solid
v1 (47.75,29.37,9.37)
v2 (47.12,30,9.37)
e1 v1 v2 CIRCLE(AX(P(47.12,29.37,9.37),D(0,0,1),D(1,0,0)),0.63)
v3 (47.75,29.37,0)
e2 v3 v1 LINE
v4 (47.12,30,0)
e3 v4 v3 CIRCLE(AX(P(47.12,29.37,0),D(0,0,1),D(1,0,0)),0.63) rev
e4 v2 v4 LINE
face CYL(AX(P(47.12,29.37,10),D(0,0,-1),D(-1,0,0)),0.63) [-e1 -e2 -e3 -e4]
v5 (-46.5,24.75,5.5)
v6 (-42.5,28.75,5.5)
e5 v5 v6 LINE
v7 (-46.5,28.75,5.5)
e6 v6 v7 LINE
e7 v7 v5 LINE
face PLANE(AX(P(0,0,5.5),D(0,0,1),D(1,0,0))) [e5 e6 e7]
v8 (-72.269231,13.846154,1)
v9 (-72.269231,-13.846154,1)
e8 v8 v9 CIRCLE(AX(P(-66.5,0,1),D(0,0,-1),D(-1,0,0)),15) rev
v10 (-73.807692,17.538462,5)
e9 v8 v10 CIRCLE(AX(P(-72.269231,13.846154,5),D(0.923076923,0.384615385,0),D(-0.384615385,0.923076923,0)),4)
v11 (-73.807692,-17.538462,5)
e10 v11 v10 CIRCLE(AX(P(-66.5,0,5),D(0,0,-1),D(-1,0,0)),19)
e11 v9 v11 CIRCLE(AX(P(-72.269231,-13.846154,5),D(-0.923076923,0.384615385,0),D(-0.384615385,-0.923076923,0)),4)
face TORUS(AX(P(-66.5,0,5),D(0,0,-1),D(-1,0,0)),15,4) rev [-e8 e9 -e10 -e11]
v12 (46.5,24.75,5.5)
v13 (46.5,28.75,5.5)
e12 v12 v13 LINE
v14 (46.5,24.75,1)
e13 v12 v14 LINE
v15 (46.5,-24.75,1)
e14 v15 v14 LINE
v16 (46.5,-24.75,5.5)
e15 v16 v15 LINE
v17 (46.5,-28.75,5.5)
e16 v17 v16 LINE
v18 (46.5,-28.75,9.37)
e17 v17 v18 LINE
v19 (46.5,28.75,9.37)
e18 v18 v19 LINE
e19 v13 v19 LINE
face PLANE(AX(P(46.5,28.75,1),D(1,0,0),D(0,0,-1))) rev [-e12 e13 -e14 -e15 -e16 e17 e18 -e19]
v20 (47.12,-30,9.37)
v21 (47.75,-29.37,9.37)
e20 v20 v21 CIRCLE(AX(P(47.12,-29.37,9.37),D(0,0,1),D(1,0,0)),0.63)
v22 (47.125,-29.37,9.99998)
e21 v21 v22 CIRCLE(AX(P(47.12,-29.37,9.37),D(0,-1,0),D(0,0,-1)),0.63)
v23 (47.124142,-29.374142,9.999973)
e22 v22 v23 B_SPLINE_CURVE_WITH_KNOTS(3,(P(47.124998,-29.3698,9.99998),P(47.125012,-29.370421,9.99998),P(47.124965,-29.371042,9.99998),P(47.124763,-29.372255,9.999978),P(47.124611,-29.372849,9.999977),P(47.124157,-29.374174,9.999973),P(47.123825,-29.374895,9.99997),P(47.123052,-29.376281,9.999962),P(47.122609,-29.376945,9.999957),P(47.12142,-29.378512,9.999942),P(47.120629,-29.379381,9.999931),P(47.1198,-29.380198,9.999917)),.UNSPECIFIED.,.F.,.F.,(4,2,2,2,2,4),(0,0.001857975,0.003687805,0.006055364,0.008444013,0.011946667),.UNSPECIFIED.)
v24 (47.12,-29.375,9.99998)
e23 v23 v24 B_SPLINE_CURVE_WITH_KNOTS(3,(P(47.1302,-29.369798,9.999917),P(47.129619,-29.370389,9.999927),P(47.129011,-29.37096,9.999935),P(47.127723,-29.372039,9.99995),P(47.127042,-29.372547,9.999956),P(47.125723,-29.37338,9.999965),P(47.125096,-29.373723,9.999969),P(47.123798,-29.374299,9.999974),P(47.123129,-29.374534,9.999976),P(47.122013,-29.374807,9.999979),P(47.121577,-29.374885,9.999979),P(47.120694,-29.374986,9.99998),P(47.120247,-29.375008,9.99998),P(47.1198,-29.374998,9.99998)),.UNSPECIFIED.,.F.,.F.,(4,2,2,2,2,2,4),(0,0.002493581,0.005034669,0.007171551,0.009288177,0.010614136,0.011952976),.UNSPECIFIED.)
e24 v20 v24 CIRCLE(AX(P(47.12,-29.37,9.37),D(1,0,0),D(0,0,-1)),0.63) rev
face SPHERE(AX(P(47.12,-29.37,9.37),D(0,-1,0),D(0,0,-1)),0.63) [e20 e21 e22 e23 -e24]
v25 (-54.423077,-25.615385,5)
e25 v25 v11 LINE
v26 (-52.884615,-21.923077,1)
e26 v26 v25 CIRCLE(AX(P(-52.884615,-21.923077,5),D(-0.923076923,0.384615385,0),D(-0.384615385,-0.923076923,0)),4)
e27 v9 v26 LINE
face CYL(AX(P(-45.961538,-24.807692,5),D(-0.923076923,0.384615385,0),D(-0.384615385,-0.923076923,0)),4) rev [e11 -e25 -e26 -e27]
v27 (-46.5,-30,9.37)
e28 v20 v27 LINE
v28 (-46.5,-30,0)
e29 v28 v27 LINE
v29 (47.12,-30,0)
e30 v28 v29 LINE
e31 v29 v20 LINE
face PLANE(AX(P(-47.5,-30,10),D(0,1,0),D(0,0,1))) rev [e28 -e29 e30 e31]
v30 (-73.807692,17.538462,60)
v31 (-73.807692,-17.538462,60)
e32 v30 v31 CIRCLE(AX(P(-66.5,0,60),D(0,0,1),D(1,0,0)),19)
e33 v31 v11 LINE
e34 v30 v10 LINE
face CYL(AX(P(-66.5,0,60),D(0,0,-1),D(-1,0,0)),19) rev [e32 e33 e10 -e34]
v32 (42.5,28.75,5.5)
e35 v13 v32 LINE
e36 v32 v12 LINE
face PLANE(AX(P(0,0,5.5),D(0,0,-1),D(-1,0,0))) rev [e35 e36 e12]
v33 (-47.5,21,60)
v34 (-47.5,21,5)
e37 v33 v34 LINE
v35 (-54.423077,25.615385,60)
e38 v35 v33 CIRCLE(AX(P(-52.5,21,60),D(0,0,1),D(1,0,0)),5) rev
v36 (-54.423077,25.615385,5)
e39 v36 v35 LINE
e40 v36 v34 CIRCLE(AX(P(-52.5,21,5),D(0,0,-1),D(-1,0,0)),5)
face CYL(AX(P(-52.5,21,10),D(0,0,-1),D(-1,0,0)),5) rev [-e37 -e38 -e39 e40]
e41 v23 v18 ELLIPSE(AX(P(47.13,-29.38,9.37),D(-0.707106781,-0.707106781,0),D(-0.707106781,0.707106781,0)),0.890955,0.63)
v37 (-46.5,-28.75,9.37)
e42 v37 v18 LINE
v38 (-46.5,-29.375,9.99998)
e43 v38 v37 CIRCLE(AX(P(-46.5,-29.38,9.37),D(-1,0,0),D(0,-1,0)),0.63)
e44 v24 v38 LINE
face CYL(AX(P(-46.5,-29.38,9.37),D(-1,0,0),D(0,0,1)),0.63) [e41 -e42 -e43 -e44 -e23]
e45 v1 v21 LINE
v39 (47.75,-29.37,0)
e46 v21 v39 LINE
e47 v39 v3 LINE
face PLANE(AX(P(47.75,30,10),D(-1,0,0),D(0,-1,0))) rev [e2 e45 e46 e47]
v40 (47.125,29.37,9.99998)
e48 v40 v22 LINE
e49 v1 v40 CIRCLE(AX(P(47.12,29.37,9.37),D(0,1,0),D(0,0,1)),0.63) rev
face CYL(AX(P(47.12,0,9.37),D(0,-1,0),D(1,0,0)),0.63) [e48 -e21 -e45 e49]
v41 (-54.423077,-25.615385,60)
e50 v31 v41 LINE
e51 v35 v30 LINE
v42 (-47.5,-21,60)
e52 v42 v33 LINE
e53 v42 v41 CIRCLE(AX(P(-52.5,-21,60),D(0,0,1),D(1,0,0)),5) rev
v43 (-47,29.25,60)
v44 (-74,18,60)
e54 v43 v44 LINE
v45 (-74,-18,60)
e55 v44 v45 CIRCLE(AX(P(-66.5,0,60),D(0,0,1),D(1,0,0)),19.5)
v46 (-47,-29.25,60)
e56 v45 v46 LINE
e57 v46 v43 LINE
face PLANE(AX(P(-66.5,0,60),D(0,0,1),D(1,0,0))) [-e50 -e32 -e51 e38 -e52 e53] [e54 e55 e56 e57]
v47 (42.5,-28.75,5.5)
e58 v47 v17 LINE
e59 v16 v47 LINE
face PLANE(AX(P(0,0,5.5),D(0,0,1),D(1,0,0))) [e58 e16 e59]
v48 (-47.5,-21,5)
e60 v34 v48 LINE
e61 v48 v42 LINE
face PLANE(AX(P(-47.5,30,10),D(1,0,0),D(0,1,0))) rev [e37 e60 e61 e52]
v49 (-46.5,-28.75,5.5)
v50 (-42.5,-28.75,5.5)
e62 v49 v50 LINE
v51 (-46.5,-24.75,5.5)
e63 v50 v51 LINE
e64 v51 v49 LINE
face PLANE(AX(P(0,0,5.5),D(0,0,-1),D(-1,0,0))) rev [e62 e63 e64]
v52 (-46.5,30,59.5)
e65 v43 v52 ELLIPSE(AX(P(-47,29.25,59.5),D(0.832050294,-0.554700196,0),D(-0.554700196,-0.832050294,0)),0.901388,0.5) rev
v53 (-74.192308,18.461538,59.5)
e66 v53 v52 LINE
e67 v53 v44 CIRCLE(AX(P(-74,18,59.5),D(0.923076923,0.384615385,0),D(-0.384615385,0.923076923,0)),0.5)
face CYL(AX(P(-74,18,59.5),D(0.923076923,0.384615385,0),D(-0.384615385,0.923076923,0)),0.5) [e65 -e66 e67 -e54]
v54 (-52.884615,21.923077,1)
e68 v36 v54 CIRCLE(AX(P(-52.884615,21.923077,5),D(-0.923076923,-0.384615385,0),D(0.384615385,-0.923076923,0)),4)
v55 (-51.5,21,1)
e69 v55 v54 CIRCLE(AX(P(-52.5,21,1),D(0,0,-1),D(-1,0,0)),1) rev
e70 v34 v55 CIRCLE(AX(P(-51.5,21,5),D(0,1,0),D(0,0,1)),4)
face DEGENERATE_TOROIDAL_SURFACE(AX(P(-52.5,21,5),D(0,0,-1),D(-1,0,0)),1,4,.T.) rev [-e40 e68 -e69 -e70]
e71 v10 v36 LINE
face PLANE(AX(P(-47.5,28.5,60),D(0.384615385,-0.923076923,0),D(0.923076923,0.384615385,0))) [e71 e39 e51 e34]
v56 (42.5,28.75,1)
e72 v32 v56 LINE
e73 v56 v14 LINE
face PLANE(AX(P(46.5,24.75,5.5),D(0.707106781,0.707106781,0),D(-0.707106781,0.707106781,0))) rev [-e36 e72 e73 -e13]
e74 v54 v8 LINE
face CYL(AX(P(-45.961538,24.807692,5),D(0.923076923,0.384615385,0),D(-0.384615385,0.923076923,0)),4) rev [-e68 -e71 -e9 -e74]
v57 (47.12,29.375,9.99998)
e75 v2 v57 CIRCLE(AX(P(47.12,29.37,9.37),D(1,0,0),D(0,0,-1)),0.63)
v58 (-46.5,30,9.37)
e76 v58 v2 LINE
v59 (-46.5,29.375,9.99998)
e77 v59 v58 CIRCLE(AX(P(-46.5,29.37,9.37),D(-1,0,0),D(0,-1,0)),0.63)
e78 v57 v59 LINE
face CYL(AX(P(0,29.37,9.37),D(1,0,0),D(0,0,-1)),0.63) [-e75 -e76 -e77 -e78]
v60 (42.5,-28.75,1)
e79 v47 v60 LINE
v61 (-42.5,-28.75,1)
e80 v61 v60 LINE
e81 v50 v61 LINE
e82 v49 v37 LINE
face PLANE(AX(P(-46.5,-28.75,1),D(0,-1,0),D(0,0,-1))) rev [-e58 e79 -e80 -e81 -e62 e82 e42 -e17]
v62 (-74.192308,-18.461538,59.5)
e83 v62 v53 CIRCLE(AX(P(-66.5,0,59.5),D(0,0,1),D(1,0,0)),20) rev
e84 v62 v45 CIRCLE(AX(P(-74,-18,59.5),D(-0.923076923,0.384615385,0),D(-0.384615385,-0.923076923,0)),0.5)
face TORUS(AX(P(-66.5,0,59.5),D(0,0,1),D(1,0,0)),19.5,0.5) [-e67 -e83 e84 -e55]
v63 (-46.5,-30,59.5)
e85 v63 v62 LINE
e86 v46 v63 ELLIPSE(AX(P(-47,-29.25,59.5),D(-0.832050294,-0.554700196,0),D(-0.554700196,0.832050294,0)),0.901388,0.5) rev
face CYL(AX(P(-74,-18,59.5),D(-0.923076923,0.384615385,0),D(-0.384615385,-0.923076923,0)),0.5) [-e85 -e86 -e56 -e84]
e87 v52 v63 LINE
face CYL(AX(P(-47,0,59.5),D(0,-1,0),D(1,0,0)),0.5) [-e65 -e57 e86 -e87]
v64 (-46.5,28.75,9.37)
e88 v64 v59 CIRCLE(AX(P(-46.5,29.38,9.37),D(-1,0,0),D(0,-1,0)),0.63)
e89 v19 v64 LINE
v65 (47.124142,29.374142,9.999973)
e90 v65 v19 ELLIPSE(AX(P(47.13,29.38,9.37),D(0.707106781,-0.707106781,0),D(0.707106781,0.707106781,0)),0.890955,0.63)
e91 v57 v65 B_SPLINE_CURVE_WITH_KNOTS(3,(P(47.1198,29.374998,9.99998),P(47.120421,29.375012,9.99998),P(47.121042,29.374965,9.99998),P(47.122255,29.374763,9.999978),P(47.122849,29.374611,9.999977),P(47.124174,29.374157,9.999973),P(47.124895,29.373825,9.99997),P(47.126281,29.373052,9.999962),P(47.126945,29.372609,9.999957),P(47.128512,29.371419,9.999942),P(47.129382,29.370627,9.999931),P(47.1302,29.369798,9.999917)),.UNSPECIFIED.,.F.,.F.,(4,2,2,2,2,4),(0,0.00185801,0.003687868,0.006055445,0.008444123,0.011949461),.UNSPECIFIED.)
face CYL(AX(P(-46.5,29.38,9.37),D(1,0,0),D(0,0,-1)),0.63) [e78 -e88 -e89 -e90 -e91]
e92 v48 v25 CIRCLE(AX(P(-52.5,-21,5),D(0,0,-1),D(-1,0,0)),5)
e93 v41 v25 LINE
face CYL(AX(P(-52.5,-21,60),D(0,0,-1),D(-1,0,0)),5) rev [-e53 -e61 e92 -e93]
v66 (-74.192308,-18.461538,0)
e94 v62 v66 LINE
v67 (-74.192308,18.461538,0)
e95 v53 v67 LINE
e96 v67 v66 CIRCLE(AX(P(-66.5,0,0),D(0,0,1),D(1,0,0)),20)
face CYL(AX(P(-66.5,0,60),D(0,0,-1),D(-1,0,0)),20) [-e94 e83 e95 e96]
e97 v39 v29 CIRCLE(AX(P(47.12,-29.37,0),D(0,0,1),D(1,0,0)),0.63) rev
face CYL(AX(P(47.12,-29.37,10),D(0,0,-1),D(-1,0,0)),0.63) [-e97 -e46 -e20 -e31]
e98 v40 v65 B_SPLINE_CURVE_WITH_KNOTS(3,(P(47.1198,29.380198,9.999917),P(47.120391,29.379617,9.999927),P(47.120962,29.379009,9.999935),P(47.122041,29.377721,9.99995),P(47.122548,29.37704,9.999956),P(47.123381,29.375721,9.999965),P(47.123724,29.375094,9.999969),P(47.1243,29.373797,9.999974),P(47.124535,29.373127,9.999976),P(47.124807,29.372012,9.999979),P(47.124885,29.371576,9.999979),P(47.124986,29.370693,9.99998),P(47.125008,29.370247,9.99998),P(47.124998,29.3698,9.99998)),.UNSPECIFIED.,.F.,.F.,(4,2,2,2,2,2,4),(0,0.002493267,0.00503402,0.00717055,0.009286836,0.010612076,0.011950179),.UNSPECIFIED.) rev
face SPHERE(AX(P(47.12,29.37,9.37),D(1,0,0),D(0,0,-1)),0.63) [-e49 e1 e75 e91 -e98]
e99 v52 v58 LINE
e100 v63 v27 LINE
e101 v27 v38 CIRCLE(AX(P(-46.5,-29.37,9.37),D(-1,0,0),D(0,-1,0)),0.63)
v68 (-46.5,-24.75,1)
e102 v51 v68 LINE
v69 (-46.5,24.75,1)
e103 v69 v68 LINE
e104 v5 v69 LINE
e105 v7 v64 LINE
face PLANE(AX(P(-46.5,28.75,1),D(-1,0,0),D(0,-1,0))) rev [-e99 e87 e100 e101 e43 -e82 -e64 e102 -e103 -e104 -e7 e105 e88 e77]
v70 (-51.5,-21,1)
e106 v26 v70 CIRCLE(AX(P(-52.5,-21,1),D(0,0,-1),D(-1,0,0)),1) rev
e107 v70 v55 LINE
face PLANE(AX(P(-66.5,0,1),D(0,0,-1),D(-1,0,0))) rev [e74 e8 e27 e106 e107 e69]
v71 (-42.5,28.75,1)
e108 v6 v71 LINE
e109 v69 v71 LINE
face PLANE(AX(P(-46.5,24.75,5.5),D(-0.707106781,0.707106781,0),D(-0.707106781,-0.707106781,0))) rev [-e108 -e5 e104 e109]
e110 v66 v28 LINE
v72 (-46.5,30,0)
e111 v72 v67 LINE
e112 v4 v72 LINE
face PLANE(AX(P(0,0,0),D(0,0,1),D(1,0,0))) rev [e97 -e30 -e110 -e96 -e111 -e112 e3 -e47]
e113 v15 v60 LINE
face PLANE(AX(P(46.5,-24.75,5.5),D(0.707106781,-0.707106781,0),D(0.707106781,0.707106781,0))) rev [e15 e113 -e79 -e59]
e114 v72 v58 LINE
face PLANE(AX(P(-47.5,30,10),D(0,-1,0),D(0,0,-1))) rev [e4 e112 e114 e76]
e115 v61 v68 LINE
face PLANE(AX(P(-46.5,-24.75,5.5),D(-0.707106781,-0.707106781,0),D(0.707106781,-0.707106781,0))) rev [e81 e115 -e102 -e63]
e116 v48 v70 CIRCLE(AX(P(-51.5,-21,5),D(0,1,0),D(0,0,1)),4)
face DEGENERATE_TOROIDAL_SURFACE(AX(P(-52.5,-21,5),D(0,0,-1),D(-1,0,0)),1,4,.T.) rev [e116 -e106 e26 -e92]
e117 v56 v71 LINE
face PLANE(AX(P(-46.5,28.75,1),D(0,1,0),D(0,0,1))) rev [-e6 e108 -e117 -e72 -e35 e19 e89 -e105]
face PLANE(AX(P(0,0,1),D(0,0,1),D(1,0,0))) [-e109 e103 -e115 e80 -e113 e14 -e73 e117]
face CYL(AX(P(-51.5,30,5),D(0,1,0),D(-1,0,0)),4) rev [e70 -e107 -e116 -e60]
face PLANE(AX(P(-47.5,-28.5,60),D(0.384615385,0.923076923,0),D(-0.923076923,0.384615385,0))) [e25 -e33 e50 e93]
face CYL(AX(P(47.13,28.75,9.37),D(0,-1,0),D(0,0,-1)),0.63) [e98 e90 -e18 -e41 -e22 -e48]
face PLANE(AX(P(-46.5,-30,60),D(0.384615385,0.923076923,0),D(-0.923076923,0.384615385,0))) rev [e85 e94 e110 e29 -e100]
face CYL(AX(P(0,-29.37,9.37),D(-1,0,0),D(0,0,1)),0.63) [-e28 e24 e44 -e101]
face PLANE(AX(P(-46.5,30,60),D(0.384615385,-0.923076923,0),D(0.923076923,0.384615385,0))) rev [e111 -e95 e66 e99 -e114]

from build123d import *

# Parameters (mm, degrees)
SZKIC1_W                    = 95.25
SZKIC1_H                    = 60
DODANIE_WYCI_GNI_CIE1_DEPTH = 10
SZKIC2_W                    = 93
SZKIC2_H                    = 57.5
WYTNIJ_WYCI_GNI_CIE1_DEPTH  = 9
DODANIE_WYCI_GNI_CIE3_DEPTH = 60
WYTNIJ_WYCI_GNI_CIE2_REACH  = 106.318
DODANIE_WYCI_GNI_CIE4_DEPTH = 1
ZAOKR_GLENIE1_R             = 0.63
ZAOKR_GLENIE2_R             = 5
ZAOKR_GLENIE3_R             = 0.5
DODANIE_WYCI_GNI_CIE2_DEPTH = 4.5
ZAOKR_GLENIE4_R             = 4


with BuildPart() as part:
    # Szkic1 → Dodanie-wyciągnięcie1 (new body)
    with BuildSketch(Plane.XY):
        with Locations((0.125, 0)):
            Rectangle(SZKIC1_W, SZKIC1_H)
    extrude(amount=DODANIE_WYCI_GNI_CIE1_DEPTH)

    # Szkic2 → Wytnij-wyciągnięcie1 (cut)
    with BuildSketch(Plane.XY.offset(10)):
        Rectangle(SZKIC2_W, SZKIC2_H)
    extrude(amount=-WYTNIJ_WYCI_GNI_CIE1_DEPTH, mode=Mode.SUBTRACT)

    # Szkic4 → Dodanie-wyciągnięcie3 (add)
    with BuildSketch(Plane.XY):
        with BuildLine():
            Line((-46.5, -30), (-74.192307692, -18.461538462))
            ThreePointArc((-74.192307692, -18.461538462), (-86.5, 0), (-74.192307692, 18.461538462))
            Line((-74.192307692, 18.461538462), (-46.5, 30))
            Line((-46.5, 30), (-46.5, -30))
        make_face()
        with BuildLine():
            Line((-47.5, -28.5), (-73.807692308, -17.538461538))
            ThreePointArc((-73.807692308, -17.538461538), (-85.5, 0), (-73.807692308, 17.538461538))
            Line((-73.807692308, 17.538461538), (-47.5, 28.5))
            Line((-47.5, 28.5), (-47.5, -28.5))
        make_face(mode=Mode.SUBTRACT)
    extrude(amount=DODANIE_WYCI_GNI_CIE3_DEPTH)

    # Szkic6 → Wytnij-wyciągnięcie2 (cut, up to next)
    with BuildSketch(Plane.XY.offset(10), mode=Mode.PRIVATE) as wytnij_wyci_gni_cie2_sk1:
        Polygon((-46.5, -30), (-47.5, -29.583333333), (-47.5, -30), align=None)
    wytnij_wyci_gni_cie2_tool1 = extrude(wytnij_wyci_gni_cie2_sk1.sketch, amount=-WYTNIJ_WYCI_GNI_CIE2_REACH, mode=Mode.PRIVATE) & part.part
    # Szkic6 → Wytnij-wyciągnięcie2 (cut, up to next)
    with BuildSketch(Plane.XY.offset(10), mode=Mode.PRIVATE) as wytnij_wyci_gni_cie2_sk2:
        Polygon((-46.5, 30), (-47.5, 29.583333333), (-47.5, 30), align=None)
    wytnij_wyci_gni_cie2_tool2 = extrude(wytnij_wyci_gni_cie2_sk2.sketch, amount=-WYTNIJ_WYCI_GNI_CIE2_REACH, mode=Mode.PRIVATE) & part.part
    add(wytnij_wyci_gni_cie2_tool1.solids().sort_by_distance((-47.166667, -29.861111, 10))[0], mode=Mode.SUBTRACT)
    add(wytnij_wyci_gni_cie2_tool2.solids().sort_by_distance((-47.166667, 29.861111, 10))[0], mode=Mode.SUBTRACT)

    # Szkic5 → Dodanie-wyciągnięcie4 (add)
    with BuildSketch(Plane(origin=(0, 0, 0), x_dir=(-1, 0, 0), z_dir=(0, 0, -1))):
        with BuildLine():
            Line((73.807692308, -17.538461538), (47.5, -28.5))
            Line((47.5, -28.5), (47.5, 28.5))
            Line((47.5, 28.5), (73.807692308, 17.538461538))
            ThreePointArc((73.807692308, 17.538461538), (85.5, 0), (73.807692308, -17.538461538))
        make_face()
    extrude(amount=-DODANIE_WYCI_GNI_CIE4_DEPTH)

    # Zaokrąglenie1
    # the kernel refuses this fillet: 0.63 mm, written as the material it takes off along each edge
    with BuildSketch(Plane(origin=(47.12, 29.37, 9.37), x_dir=(1, 0, 0), z_dir=(0, 1, 0))) as zaokr_glenie1_piece_1_section:
        Polygon((0, 0), (ZAOKR_GLENIE1_R * 1.02, 0), (ZAOKR_GLENIE1_R * 1.02, -ZAOKR_GLENIE1_R * 1.02), (0, -ZAOKR_GLENIE1_R * 1.02), align=None)
    zaokr_glenie1_piece_1 = extrude(amount=ZAOKR_GLENIE1_R * 1.02, mode=Mode.PRIVATE)
    zaokr_glenie1_piece_1 = zaokr_glenie1_piece_1 - Plane(origin=(47.12, 29.37, 9.37), x_dir=(-0.7071067811865475, 0, -0.7071067811865475), z_dir=(0, 1, 0)) * Sphere(ZAOKR_GLENIE1_R, mode=Mode.PRIVATE)
    add(zaokr_glenie1_piece_1, mode=Mode.SUBTRACT)
    with BuildSketch(Plane(origin=(47.12, -29.37, 9.37), x_dir=(0, 0, 1), z_dir=(1, 0, 0))) as zaokr_glenie1_piece_2_section:
        Polygon((0, 0), (ZAOKR_GLENIE1_R * 1.02, 0), (ZAOKR_GLENIE1_R * 1.02, ZAOKR_GLENIE1_R * 1.02), (0, ZAOKR_GLENIE1_R * 1.02), align=None)
    zaokr_glenie1_piece_2 = extrude(amount=ZAOKR_GLENIE1_R * 1.02, mode=Mode.PRIVATE)
    zaokr_glenie1_piece_2 = zaokr_glenie1_piece_2 - Plane(origin=(47.12, -29.37, 9.37), x_dir=(0, 0.7071067811865475, -0.7071067811865475), z_dir=(1, 0, 0)) * Sphere(ZAOKR_GLENIE1_R, mode=Mode.PRIVATE)
    add(zaokr_glenie1_piece_2, mode=Mode.SUBTRACT)
    with BuildSketch(Plane(origin=(47.75, 30, -1.575), x_dir=(-1, 0, 0), z_dir=(0, 0, 1)), Plane(origin=(47.75, -30, -1.575), x_dir=(0, 1, 0), z_dir=(0, 0, 1))) as zaokr_glenie1_piece_3:
        with BuildLine():
            CenterArc((ZAOKR_GLENIE1_R, ZAOKR_GLENIE1_R), ZAOKR_GLENIE1_R, 180, 90)
            Line((0, ZAOKR_GLENIE1_R), (0, 0))
            Line((0, 0), (ZAOKR_GLENIE1_R, 0))
        make_face()
    extrude(amount=10.945, mode=Mode.SUBTRACT)
    with BuildSketch(Plane(origin=(-46.5, 30, 10), x_dir=(0, 0, -1), z_dir=(1, 0, 0))) as zaokr_glenie1_piece_4:
        with BuildLine():
            CenterArc((ZAOKR_GLENIE1_R, -ZAOKR_GLENIE1_R), ZAOKR_GLENIE1_R, 90, 90)
            Line((0, -ZAOKR_GLENIE1_R), (0, 0))
            Line((0, 0), (ZAOKR_GLENIE1_R, 0))
        make_face()
    extrude(amount=93.62, mode=Mode.SUBTRACT)
    with BuildSketch(Plane(origin=(47.75, 29.37, 10), x_dir=(0, 0, -1), z_dir=(0, -1, 0))) as zaokr_glenie1_piece_5:
        with BuildLine():
            CenterArc((ZAOKR_GLENIE1_R, -ZAOKR_GLENIE1_R), ZAOKR_GLENIE1_R, 90, 90)
            Line((0, -ZAOKR_GLENIE1_R), (0, 0))
            Line((0, 0), (ZAOKR_GLENIE1_R, 0))
        make_face()
    extrude(amount=58.74, mode=Mode.SUBTRACT)
    with BuildSketch(Plane(origin=(47.12, -30, 10), x_dir=(0, 1, 0), z_dir=(-1, 0, 0))) as zaokr_glenie1_piece_6:
        with BuildLine():
            CenterArc((ZAOKR_GLENIE1_R, ZAOKR_GLENIE1_R), ZAOKR_GLENIE1_R, 180, 90)
            Line((0, ZAOKR_GLENIE1_R), (0, 0))
            Line((0, 0), (ZAOKR_GLENIE1_R, 0))
        make_face()
    extrude(amount=93.62, mode=Mode.SUBTRACT)
    with BuildSketch(Plane(origin=(46.5, 28.75, 10), x_dir=(1, 0, 0), z_dir=(0, -1, 0))) as zaokr_glenie1_piece_7:
        with BuildLine():
            CenterArc((ZAOKR_GLENIE1_R, -ZAOKR_GLENIE1_R), ZAOKR_GLENIE1_R, 90, 90)
            Line((0, -ZAOKR_GLENIE1_R), (0, 0))
            Line((0, 0), (ZAOKR_GLENIE1_R, 0))
        make_face()
    extrude(amount=57.5, mode=Mode.SUBTRACT)
    with BuildSketch(Plane(origin=(-46.5, 28.75, 10), x_dir=(0, 1, 0), z_dir=(1, 0, 0)), Plane(origin=(46.5, -28.75, 10), x_dir=(0, -1, 0), z_dir=(-1, 0, 0))) as zaokr_glenie1_piece_8:
        with BuildLine():
            CenterArc((ZAOKR_GLENIE1_R, -ZAOKR_GLENIE1_R), ZAOKR_GLENIE1_R, 90, 90)
            Line((0, -ZAOKR_GLENIE1_R), (0, 0))
            Line((0, 0), (ZAOKR_GLENIE1_R, 0))
        make_face()
    extrude(amount=93, mode=Mode.SUBTRACT)
    with BuildSketch(Plane(origin=(-46.5, 28.75, 10), x_dir=(0, 1, 0), z_dir=(1, 0, 0))) as zaokr_glenie1_piece_9a_section:
        with BuildLine():
            CenterArc((ZAOKR_GLENIE1_R, -ZAOKR_GLENIE1_R), ZAOKR_GLENIE1_R, 90, 90)
            Line((0, -ZAOKR_GLENIE1_R), (0, 0))
            Line((0, 0), (ZAOKR_GLENIE1_R, 0))
        make_face()
    zaokr_glenie1_piece_9a = extrude(amount=94.575, mode=Mode.PRIVATE)
    zaokr_glenie1_piece_9a = split(zaokr_glenie1_piece_9a, bisect_by=Plane(origin=(47.75, 28.75, 10), z_dir=(-1, 0, 0)), keep=Keep.TOP, mode=Mode.PRIVATE)
    zaokr_glenie1_piece_9a = split(zaokr_glenie1_piece_9a, bisect_by=Plane(origin=(46.5, 28.75, 10), z_dir=(1, 0, 0)), keep=Keep.TOP, mode=Mode.PRIVATE)
    with BuildSketch(Plane(origin=(46.5, 30.325, 10), x_dir=(1, 0, 0), z_dir=(0, -1, 0))) as zaokr_glenie1_piece_9b_section:
        with BuildLine():
            CenterArc((ZAOKR_GLENIE1_R, -ZAOKR_GLENIE1_R), ZAOKR_GLENIE1_R, 90, 90)
            Line((0, -ZAOKR_GLENIE1_R), (0, 0))
            Line((0, 0), (ZAOKR_GLENIE1_R, 0))
        make_face()
    zaokr_glenie1_piece_9b = extrude(amount=59.075, mode=Mode.PRIVATE)
    zaokr_glenie1_piece_9b = split(zaokr_glenie1_piece_9b, bisect_by=Plane(origin=(46.5, 30, 10), z_dir=(0, -1, 0)), keep=Keep.TOP, mode=Mode.PRIVATE)
    zaokr_glenie1_piece_9b = split(zaokr_glenie1_piece_9b, bisect_by=Plane(origin=(46.5, 28.75, 10), z_dir=(0, 1, 0)), keep=Keep.TOP, mode=Mode.PRIVATE)
    zaokr_glenie1_piece_9 = zaokr_glenie1_piece_9a & zaokr_glenie1_piece_9b
    add(zaokr_glenie1_piece_9, mode=Mode.SUBTRACT)
    with BuildSketch(Plane(origin=(46.5, 28.75, 10), x_dir=(1, 0, 0), z_dir=(0, -1, 0))) as zaokr_glenie1_piece_10a_section:
        with BuildLine():
            CenterArc((ZAOKR_GLENIE1_R, -ZAOKR_GLENIE1_R), ZAOKR_GLENIE1_R, 90, 90)
            Line((0, -ZAOKR_GLENIE1_R), (0, 0))
            Line((0, 0), (ZAOKR_GLENIE1_R, 0))
        make_face()
    zaokr_glenie1_piece_10a = extrude(amount=59.075, mode=Mode.PRIVATE)
    zaokr_glenie1_piece_10a = split(zaokr_glenie1_piece_10a, bisect_by=Plane(origin=(46.5, -30, 10), z_dir=(0, 1, 0)), keep=Keep.TOP, mode=Mode.PRIVATE)
    zaokr_glenie1_piece_10a = split(zaokr_glenie1_piece_10a, bisect_by=Plane(origin=(46.5, -28.75, 10), z_dir=(0, -1, 0)), keep=Keep.TOP, mode=Mode.PRIVATE)
    with BuildSketch(Plane(origin=(48.075, -28.75, 10), x_dir=(0, -1, 0), z_dir=(-1, 0, 0))) as zaokr_glenie1_piece_10b_section:
        with BuildLine():
            CenterArc((ZAOKR_GLENIE1_R, -ZAOKR_GLENIE1_R), ZAOKR_GLENIE1_R, 90, 90)
            Line((0, -ZAOKR_GLENIE1_R), (0, 0))
            Line((0, 0), (ZAOKR_GLENIE1_R, 0))
        make_face()
    zaokr_glenie1_piece_10b = extrude(amount=94.575, mode=Mode.PRIVATE)
    zaokr_glenie1_piece_10b = split(zaokr_glenie1_piece_10b, bisect_by=Plane(origin=(47.75, -28.75, 10), z_dir=(-1, 0, 0)), keep=Keep.TOP, mode=Mode.PRIVATE)
    zaokr_glenie1_piece_10b = split(zaokr_glenie1_piece_10b, bisect_by=Plane(origin=(46.5, -28.75, 10), z_dir=(1, 0, 0)), keep=Keep.TOP, mode=Mode.PRIVATE)
    zaokr_glenie1_piece_10 = zaokr_glenie1_piece_10a & zaokr_glenie1_piece_10b
    add(zaokr_glenie1_piece_10, mode=Mode.SUBTRACT)

    # Zaokrąglenie2
    zaokr_glenie2_edges = [part.edges().sort_by_distance(p)[0] for p in [
        (-47.5, 28.5, 30.5),
        (-47.5, -28.5, 30.5),
    ]]
    fillet(zaokr_glenie2_edges, radius=ZAOKR_GLENIE2_R)

    # Zaokrąglenie3
    zaokr_glenie3_edges = [part.edges().sort_by_distance(p)[0] for p in [
        (-86.5, 0, 60),
        (-60.346153846, -24.230769231, 60),
        (-46.5, 0, 60),
        (-60.346153846, 24.230769231, 60),
    ]]
    fillet(zaokr_glenie3_edges, radius=ZAOKR_GLENIE3_R)

    # Szkic3 → Dodanie-wyciągnięcie2 (add)
    with BuildSketch(Plane.XY.offset(1)):
        Polygon((46.5, -28.75), (46.5, -24.75), (42.5, -28.75), align=None)
        Polygon((-42.5, -28.75), (-46.5, -28.75), (-46.5, -24.75), align=None)
        Polygon((-46.5, 28.75), (-46.5, 24.75), (-42.5, 28.75), align=None)
        Polygon((42.5, 28.75), (46.5, 28.75), (46.5, 24.75), align=None)
    extrude(amount=DODANIE_WYCI_GNI_CIE2_DEPTH)

    # Zaokrąglenie4
    zaokr_glenie4_edges = [part.edges().sort_by_distance(p)[0] for p in [
        (-47.5, 0, 1),
        (-64.115384615, -21.576923077, 1),
        (-49.726499019, -25.160251472, 1),
        (-49.726499019, 25.160251472, 1),
        (-85.5, 0, 1),
        (-64.115384615, 21.576923077, 1),
    ]]
    fillet(zaokr_glenie4_edges, radius=ZAOKR_GLENIE4_R)


solid = part.part
